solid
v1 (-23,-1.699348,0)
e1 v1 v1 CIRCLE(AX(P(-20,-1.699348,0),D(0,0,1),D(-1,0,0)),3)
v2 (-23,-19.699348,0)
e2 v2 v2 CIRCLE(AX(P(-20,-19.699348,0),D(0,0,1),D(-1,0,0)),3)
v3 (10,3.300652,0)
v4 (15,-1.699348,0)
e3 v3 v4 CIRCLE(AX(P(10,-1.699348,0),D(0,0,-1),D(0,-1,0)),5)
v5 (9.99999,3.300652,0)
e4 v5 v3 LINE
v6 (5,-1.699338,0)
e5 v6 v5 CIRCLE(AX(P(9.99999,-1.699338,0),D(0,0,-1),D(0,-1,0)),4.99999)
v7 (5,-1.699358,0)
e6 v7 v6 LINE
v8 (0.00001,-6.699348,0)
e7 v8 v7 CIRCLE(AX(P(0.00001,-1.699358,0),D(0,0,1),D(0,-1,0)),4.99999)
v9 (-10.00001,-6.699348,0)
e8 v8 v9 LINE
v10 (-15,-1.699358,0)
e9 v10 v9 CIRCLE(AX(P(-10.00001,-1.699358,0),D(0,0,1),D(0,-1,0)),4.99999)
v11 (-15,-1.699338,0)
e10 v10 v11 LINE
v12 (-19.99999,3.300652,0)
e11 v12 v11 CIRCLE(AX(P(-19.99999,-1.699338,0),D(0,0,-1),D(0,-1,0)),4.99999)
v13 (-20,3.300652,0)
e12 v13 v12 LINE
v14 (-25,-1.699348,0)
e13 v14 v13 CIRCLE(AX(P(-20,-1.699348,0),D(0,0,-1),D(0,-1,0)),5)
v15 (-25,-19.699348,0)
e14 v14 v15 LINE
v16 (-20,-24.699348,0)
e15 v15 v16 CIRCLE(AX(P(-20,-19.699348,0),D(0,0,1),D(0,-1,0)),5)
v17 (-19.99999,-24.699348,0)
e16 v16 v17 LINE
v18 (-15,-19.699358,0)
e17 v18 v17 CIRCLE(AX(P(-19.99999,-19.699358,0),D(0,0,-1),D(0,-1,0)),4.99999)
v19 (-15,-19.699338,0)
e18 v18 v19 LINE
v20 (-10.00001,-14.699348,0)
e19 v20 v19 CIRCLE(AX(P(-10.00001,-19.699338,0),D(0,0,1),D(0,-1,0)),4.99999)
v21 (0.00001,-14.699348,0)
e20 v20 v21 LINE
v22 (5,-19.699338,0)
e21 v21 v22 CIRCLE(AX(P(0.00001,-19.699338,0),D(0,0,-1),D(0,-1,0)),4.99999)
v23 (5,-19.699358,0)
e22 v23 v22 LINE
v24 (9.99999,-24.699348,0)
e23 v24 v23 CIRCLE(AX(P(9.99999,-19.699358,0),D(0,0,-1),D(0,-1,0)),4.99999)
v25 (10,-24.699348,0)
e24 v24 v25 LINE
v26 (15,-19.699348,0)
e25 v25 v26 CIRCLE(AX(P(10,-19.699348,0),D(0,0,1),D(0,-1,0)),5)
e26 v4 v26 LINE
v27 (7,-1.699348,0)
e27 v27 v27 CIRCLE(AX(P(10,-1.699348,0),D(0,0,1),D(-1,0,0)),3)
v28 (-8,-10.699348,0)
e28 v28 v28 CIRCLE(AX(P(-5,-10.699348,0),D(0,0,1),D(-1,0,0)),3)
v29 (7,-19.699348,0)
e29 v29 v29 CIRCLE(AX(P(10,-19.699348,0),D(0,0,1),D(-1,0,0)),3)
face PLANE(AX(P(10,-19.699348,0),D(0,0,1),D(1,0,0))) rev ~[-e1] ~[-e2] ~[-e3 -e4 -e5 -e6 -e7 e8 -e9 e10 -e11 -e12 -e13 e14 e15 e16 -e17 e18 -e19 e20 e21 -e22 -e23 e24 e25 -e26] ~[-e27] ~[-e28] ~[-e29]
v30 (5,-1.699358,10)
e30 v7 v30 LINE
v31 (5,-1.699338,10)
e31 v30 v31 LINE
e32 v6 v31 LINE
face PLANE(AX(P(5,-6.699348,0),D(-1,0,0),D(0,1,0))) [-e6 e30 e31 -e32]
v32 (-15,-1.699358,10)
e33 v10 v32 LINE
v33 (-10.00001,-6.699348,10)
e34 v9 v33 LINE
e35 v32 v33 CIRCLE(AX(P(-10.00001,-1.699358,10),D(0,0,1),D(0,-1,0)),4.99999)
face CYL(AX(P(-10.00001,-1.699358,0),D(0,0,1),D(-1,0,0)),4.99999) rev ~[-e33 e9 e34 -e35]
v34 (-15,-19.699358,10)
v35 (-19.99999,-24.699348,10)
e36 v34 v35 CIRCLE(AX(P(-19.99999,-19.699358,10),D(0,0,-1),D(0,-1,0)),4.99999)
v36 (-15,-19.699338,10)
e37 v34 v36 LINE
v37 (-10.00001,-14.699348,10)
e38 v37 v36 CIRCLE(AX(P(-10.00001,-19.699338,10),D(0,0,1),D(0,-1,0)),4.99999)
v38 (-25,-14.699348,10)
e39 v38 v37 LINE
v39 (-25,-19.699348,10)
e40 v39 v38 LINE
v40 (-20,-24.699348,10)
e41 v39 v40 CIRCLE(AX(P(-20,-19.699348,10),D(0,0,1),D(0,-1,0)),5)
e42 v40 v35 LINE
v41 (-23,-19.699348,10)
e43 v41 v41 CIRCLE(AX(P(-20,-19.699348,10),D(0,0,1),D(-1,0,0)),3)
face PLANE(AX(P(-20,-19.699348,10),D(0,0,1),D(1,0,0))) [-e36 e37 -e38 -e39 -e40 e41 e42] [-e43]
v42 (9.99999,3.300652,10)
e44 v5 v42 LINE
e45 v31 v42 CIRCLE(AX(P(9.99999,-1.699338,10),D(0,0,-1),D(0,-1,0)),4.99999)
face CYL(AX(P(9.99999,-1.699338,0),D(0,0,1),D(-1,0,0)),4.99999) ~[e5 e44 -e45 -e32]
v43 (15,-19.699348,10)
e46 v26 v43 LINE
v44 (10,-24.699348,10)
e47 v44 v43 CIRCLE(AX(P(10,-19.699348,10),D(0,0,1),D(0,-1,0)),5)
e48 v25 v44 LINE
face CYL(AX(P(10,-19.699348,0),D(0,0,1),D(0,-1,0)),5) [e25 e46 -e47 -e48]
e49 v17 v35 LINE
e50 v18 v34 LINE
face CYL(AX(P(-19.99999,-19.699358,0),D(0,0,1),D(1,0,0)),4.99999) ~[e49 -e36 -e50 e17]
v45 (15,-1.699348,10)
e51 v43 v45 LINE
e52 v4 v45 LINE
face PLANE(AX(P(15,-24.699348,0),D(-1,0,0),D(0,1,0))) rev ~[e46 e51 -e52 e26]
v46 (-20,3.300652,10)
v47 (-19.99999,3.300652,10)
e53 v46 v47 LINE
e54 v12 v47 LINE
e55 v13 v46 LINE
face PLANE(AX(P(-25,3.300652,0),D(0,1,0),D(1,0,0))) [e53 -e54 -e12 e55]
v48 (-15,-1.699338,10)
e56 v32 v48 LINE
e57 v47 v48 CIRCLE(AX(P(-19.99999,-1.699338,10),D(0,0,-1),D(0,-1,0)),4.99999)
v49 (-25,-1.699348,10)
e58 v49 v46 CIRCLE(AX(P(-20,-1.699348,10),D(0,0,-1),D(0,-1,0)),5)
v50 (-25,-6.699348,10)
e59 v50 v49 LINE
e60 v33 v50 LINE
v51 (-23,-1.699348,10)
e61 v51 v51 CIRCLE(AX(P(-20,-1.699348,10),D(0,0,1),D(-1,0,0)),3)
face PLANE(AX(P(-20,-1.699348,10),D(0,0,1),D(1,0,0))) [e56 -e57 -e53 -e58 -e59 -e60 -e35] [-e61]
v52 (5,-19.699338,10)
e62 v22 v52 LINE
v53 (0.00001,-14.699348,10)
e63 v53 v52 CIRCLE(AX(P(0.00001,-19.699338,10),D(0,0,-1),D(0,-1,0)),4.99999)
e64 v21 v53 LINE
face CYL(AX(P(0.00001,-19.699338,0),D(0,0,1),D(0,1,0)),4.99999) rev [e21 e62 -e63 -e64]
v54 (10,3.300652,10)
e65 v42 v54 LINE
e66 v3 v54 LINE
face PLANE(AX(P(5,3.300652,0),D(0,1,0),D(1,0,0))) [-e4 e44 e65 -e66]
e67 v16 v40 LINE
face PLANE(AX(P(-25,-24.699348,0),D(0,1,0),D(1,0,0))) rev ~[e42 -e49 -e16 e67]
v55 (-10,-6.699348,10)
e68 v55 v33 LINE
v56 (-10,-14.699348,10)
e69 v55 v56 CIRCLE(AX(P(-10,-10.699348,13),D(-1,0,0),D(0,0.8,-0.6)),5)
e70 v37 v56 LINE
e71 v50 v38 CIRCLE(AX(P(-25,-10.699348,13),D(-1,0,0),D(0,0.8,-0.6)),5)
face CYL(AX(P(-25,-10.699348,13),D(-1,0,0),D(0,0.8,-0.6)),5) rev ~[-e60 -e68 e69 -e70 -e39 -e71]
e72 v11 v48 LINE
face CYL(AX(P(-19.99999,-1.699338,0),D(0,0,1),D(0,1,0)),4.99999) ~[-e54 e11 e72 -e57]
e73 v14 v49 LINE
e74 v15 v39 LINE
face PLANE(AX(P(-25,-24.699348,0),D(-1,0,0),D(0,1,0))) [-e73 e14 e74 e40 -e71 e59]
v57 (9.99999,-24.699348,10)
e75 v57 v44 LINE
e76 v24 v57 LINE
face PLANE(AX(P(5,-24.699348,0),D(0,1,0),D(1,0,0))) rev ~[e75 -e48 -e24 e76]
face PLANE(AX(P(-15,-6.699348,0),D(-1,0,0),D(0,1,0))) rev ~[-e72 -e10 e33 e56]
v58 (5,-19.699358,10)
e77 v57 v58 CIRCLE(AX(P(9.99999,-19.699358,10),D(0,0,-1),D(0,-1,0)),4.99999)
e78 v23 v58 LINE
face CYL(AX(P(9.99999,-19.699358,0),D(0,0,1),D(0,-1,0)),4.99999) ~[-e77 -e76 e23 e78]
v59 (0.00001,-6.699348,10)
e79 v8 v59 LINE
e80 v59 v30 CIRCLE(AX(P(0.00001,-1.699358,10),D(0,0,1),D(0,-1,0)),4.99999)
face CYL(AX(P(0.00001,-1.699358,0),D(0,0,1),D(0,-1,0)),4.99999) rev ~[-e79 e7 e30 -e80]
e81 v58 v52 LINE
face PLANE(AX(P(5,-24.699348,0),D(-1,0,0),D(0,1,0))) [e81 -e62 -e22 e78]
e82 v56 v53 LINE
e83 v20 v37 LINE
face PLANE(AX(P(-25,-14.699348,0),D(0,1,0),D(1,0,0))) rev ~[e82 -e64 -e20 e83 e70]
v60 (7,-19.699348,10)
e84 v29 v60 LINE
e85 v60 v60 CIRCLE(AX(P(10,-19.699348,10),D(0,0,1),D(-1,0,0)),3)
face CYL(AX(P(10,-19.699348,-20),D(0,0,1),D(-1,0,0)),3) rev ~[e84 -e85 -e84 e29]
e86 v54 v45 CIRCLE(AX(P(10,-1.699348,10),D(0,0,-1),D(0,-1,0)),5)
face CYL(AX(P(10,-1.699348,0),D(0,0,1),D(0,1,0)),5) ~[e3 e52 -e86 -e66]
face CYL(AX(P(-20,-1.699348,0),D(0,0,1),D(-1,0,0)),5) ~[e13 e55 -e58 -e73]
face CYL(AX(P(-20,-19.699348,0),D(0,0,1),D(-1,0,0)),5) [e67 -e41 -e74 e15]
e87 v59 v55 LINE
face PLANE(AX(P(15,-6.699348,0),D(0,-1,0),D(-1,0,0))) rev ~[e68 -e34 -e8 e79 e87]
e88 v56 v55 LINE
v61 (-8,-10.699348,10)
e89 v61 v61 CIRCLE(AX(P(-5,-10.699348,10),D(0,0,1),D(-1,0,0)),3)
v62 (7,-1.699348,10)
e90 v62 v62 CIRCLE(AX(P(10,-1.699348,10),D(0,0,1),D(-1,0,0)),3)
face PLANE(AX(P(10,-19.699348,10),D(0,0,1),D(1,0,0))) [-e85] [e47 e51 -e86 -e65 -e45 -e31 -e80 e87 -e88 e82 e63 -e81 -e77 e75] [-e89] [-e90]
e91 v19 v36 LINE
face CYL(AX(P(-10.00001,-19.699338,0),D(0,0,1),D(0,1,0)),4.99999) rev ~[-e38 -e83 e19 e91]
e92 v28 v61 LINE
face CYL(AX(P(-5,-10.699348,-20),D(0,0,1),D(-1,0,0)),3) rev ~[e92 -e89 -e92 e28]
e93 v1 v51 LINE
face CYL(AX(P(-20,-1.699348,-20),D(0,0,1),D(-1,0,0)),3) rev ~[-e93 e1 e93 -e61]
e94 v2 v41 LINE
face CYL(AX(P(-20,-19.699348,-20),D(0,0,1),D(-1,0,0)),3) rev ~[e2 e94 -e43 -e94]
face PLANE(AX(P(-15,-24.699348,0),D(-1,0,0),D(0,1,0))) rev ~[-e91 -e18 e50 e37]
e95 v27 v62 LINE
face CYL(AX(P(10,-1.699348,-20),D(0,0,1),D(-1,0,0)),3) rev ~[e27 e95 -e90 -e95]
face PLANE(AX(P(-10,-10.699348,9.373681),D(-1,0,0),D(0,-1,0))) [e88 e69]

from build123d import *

# Parameters (mm, degrees)
F1_W       = 10
F1_H       = 10
F2_DEPTH   = 10
F1_H_2     = 8
F1_W_2     = 20
F3_DEPTH   = 10
F5_DEPTH   = 15
F6_D       = 6
F6_DEPTH   = 20
F6_TIP     = 1.8025818571
F6_2_D     = 6
F6_2_DEPTH = 20
F6_2_TIP   = 1.8025818571
F6_3_D     = 6
F6_3_DEPTH = 20
F6_3_TIP   = 1.8025818571
F6_4_D     = 6
F6_4_DEPTH = 20
F6_4_TIP   = 1.8025818571
F6_5_D     = 6
F6_5_DEPTH = 20
F6_5_TIP   = 1.8025818571
F7_R       = 5
F7_2_R     = 5
F7_3_R     = 5
F7_4_R     = 5
F9_R       = 4.99999


# Not quite as in the source:
# - a fillet or chamfer is up to 0.001 mm smaller than in the source, because OpenCascade refuses the exact size


with BuildPart() as f2:
    # F1 (on Top) → F2 (new body)
    with BuildSketch(Plane.XY):
        with Locations((-20, -1.6993483007)):
            Rectangle(F1_W, F1_H)
    extrude(amount=F2_DEPTH)

    # F6
    with Locations(Plane(origin=(0, 0, 0), x_dir=(1, 0, 0), z_dir=(0, 0, -1))):
        with Locations((-20, 1.6993483007), (-5, 10.6993483007), (10, 1.6993483007), (10, 19.6993483007), (-20, 19.6993483007)):
            Hole(F6_D / 2, depth=F6_DEPTH)
            with Locations((0, 0, -(F6_DEPTH + F6_TIP / 2))):  # 118° drill point
                Cone(0, F6_D / 2, F6_TIP, mode=Mode.SUBTRACT)

    # F7
    f7_edges = [f2.edges().sort_by_distance(p)[0] for p in [
        (-25, 3.300652, 5),
    ]]
    fillet(f7_edges, radius=F7_R)


with BuildPart() as f2b:
    # F1 (on Top) → F2, piece 2 (new body)
    with BuildSketch(Plane.XY):
        with Locations((-20, -19.6993483007)):
            Rectangle(F1_W, F1_H)
    extrude(amount=F2_DEPTH)

    # F6#2
    with Locations(Plane(origin=(0, 0, 0), x_dir=(1, 0, 0), z_dir=(0, 0, -1))):
        with Locations((-20, 1.6993483007), (-5, 10.6993483007), (10, 1.6993483007), (10, 19.6993483007), (-20, 19.6993483007)):
            Hole(F6_2_D / 2, depth=F6_2_DEPTH)
            with Locations((0, 0, -(F6_2_DEPTH + F6_2_TIP / 2))):  # 118° drill point
                Cone(0, F6_2_D / 2, F6_2_TIP, mode=Mode.SUBTRACT)

    # F7#2
    f7_2_edges = [f2b.edges().sort_by_distance(p)[0] for p in [
        (-25, -24.699348, 5),
    ]]
    fillet(f7_2_edges, radius=F7_2_R)


with BuildPart() as f2c:
    # F1 (on Top) → F2, piece 3 (new body)
    with BuildSketch(Plane.XY):
        with Locations((10, -1.6993483007)):
            Rectangle(F1_W, F1_H)
    extrude(amount=F2_DEPTH)

    # F6#3
    with Locations(Plane(origin=(0, 0, 0), x_dir=(1, 0, 0), z_dir=(0, 0, -1))):
        with Locations((-20, 1.6993483007), (-5, 10.6993483007), (10, 1.6993483007), (10, 19.6993483007), (-20, 19.6993483007)):
            Hole(F6_3_D / 2, depth=F6_3_DEPTH)
            with Locations((0, 0, -(F6_3_DEPTH + F6_3_TIP / 2))):  # 118° drill point
                Cone(0, F6_3_D / 2, F6_3_TIP, mode=Mode.SUBTRACT)

    # F7#4
    f7_4_edges = [f2c.edges().sort_by_distance(p)[0] for p in [
        (15, 3.300652, 5),
    ]]
    fillet(f7_4_edges, radius=F7_4_R)


with BuildPart() as f2d:
    # F1 (on Top) → F2, piece 4 (new body)
    with BuildSketch(Plane.XY):
        with Locations((10, -19.6993483007)):
            Rectangle(F1_W, F1_H)
    extrude(amount=F2_DEPTH)

    # F6#4
    with Locations(Plane(origin=(0, 0, 0), x_dir=(1, 0, 0), z_dir=(0, 0, -1))):
        with Locations((-20, 1.6993483007), (-5, 10.6993483007), (10, 1.6993483007), (10, 19.6993483007), (-20, 19.6993483007)):
            Hole(F6_4_D / 2, depth=F6_4_DEPTH)
            with Locations((0, 0, -(F6_4_DEPTH + F6_4_TIP / 2))):  # 118° drill point
                Cone(0, F6_4_D / 2, F6_4_TIP, mode=Mode.SUBTRACT)

    # F7#3
    f7_3_edges = [f2d.edges().sort_by_distance(p)[0] for p in [
        (15, -24.699348, 5),
    ]]
    fillet(f7_3_edges, radius=F7_3_R)


with BuildPart() as f3:
    # F1 (on Top) → F3 (new body)
    with BuildSketch(Plane.XY):
        with Locations((-20, -10.6993483007)):
            Rectangle(F1_W, F1_H_2)
        with Locations((-5, -10.6993483007)):
            Rectangle(F1_W_2, F1_H_2)
        with Locations((10, -10.6993483007)):
            Rectangle(F1_W, F1_H_2)
    extrude(amount=F3_DEPTH)

    # F4 (on face) → F5 (cut)
    with BuildSketch(Plane(origin=(-25, 0, 0), x_dir=(0, -1, 0), z_dir=(-1, 0, 0))):
        with BuildLine():
            Line((14.6993483007, 10), (6.6993483007, 10))
            ThreePointArc((6.6993483007, 10), (10.6993483007, 8), (14.6993483007, 10))
        make_face()
    extrude(amount=-F5_DEPTH, mode=Mode.SUBTRACT)

    # F6#5
    with Locations(Plane(origin=(0, 0, 0), x_dir=(1, 0, 0), z_dir=(0, 0, -1))):
        with Locations((-20, 1.6993483007), (-5, 10.6993483007), (10, 1.6993483007), (10, 19.6993483007), (-20, 19.6993483007)):
            Hole(F6_5_D / 2, depth=F6_5_DEPTH)
            with Locations((0, 0, -(F6_5_DEPTH + F6_5_TIP / 2))):  # 118° drill point
                Cone(0, F6_5_D / 2, F6_5_TIP, mode=Mode.SUBTRACT)


with BuildPart() as f2_1:
    add(f2.part)

    # F8: union F2c, F3, F2b, F2d
    add(f2c.part)
    add(f3.part)
    add(f2b.part)
    add(f2d.part)

    # F9 (radius 5 in the source; OpenCascade refuses exactly that, so slightly less here)
    f9_edges = [f2_1.edges().sort_by_distance(p)[0] for p in [
        (-15, 3.300652, 5),
        (5, 3.300652, 5),
        (-15, -24.699348, 5),
        (5, -24.699348, 5),
        (-15, -14.699348, 5),
        (5, -14.699348, 5),
        (5, -6.699348, 5),
        (-15, -6.699348, 5),
    ]]
    fillet(f9_edges, radius=F9_R)


solid = f2_1.part
